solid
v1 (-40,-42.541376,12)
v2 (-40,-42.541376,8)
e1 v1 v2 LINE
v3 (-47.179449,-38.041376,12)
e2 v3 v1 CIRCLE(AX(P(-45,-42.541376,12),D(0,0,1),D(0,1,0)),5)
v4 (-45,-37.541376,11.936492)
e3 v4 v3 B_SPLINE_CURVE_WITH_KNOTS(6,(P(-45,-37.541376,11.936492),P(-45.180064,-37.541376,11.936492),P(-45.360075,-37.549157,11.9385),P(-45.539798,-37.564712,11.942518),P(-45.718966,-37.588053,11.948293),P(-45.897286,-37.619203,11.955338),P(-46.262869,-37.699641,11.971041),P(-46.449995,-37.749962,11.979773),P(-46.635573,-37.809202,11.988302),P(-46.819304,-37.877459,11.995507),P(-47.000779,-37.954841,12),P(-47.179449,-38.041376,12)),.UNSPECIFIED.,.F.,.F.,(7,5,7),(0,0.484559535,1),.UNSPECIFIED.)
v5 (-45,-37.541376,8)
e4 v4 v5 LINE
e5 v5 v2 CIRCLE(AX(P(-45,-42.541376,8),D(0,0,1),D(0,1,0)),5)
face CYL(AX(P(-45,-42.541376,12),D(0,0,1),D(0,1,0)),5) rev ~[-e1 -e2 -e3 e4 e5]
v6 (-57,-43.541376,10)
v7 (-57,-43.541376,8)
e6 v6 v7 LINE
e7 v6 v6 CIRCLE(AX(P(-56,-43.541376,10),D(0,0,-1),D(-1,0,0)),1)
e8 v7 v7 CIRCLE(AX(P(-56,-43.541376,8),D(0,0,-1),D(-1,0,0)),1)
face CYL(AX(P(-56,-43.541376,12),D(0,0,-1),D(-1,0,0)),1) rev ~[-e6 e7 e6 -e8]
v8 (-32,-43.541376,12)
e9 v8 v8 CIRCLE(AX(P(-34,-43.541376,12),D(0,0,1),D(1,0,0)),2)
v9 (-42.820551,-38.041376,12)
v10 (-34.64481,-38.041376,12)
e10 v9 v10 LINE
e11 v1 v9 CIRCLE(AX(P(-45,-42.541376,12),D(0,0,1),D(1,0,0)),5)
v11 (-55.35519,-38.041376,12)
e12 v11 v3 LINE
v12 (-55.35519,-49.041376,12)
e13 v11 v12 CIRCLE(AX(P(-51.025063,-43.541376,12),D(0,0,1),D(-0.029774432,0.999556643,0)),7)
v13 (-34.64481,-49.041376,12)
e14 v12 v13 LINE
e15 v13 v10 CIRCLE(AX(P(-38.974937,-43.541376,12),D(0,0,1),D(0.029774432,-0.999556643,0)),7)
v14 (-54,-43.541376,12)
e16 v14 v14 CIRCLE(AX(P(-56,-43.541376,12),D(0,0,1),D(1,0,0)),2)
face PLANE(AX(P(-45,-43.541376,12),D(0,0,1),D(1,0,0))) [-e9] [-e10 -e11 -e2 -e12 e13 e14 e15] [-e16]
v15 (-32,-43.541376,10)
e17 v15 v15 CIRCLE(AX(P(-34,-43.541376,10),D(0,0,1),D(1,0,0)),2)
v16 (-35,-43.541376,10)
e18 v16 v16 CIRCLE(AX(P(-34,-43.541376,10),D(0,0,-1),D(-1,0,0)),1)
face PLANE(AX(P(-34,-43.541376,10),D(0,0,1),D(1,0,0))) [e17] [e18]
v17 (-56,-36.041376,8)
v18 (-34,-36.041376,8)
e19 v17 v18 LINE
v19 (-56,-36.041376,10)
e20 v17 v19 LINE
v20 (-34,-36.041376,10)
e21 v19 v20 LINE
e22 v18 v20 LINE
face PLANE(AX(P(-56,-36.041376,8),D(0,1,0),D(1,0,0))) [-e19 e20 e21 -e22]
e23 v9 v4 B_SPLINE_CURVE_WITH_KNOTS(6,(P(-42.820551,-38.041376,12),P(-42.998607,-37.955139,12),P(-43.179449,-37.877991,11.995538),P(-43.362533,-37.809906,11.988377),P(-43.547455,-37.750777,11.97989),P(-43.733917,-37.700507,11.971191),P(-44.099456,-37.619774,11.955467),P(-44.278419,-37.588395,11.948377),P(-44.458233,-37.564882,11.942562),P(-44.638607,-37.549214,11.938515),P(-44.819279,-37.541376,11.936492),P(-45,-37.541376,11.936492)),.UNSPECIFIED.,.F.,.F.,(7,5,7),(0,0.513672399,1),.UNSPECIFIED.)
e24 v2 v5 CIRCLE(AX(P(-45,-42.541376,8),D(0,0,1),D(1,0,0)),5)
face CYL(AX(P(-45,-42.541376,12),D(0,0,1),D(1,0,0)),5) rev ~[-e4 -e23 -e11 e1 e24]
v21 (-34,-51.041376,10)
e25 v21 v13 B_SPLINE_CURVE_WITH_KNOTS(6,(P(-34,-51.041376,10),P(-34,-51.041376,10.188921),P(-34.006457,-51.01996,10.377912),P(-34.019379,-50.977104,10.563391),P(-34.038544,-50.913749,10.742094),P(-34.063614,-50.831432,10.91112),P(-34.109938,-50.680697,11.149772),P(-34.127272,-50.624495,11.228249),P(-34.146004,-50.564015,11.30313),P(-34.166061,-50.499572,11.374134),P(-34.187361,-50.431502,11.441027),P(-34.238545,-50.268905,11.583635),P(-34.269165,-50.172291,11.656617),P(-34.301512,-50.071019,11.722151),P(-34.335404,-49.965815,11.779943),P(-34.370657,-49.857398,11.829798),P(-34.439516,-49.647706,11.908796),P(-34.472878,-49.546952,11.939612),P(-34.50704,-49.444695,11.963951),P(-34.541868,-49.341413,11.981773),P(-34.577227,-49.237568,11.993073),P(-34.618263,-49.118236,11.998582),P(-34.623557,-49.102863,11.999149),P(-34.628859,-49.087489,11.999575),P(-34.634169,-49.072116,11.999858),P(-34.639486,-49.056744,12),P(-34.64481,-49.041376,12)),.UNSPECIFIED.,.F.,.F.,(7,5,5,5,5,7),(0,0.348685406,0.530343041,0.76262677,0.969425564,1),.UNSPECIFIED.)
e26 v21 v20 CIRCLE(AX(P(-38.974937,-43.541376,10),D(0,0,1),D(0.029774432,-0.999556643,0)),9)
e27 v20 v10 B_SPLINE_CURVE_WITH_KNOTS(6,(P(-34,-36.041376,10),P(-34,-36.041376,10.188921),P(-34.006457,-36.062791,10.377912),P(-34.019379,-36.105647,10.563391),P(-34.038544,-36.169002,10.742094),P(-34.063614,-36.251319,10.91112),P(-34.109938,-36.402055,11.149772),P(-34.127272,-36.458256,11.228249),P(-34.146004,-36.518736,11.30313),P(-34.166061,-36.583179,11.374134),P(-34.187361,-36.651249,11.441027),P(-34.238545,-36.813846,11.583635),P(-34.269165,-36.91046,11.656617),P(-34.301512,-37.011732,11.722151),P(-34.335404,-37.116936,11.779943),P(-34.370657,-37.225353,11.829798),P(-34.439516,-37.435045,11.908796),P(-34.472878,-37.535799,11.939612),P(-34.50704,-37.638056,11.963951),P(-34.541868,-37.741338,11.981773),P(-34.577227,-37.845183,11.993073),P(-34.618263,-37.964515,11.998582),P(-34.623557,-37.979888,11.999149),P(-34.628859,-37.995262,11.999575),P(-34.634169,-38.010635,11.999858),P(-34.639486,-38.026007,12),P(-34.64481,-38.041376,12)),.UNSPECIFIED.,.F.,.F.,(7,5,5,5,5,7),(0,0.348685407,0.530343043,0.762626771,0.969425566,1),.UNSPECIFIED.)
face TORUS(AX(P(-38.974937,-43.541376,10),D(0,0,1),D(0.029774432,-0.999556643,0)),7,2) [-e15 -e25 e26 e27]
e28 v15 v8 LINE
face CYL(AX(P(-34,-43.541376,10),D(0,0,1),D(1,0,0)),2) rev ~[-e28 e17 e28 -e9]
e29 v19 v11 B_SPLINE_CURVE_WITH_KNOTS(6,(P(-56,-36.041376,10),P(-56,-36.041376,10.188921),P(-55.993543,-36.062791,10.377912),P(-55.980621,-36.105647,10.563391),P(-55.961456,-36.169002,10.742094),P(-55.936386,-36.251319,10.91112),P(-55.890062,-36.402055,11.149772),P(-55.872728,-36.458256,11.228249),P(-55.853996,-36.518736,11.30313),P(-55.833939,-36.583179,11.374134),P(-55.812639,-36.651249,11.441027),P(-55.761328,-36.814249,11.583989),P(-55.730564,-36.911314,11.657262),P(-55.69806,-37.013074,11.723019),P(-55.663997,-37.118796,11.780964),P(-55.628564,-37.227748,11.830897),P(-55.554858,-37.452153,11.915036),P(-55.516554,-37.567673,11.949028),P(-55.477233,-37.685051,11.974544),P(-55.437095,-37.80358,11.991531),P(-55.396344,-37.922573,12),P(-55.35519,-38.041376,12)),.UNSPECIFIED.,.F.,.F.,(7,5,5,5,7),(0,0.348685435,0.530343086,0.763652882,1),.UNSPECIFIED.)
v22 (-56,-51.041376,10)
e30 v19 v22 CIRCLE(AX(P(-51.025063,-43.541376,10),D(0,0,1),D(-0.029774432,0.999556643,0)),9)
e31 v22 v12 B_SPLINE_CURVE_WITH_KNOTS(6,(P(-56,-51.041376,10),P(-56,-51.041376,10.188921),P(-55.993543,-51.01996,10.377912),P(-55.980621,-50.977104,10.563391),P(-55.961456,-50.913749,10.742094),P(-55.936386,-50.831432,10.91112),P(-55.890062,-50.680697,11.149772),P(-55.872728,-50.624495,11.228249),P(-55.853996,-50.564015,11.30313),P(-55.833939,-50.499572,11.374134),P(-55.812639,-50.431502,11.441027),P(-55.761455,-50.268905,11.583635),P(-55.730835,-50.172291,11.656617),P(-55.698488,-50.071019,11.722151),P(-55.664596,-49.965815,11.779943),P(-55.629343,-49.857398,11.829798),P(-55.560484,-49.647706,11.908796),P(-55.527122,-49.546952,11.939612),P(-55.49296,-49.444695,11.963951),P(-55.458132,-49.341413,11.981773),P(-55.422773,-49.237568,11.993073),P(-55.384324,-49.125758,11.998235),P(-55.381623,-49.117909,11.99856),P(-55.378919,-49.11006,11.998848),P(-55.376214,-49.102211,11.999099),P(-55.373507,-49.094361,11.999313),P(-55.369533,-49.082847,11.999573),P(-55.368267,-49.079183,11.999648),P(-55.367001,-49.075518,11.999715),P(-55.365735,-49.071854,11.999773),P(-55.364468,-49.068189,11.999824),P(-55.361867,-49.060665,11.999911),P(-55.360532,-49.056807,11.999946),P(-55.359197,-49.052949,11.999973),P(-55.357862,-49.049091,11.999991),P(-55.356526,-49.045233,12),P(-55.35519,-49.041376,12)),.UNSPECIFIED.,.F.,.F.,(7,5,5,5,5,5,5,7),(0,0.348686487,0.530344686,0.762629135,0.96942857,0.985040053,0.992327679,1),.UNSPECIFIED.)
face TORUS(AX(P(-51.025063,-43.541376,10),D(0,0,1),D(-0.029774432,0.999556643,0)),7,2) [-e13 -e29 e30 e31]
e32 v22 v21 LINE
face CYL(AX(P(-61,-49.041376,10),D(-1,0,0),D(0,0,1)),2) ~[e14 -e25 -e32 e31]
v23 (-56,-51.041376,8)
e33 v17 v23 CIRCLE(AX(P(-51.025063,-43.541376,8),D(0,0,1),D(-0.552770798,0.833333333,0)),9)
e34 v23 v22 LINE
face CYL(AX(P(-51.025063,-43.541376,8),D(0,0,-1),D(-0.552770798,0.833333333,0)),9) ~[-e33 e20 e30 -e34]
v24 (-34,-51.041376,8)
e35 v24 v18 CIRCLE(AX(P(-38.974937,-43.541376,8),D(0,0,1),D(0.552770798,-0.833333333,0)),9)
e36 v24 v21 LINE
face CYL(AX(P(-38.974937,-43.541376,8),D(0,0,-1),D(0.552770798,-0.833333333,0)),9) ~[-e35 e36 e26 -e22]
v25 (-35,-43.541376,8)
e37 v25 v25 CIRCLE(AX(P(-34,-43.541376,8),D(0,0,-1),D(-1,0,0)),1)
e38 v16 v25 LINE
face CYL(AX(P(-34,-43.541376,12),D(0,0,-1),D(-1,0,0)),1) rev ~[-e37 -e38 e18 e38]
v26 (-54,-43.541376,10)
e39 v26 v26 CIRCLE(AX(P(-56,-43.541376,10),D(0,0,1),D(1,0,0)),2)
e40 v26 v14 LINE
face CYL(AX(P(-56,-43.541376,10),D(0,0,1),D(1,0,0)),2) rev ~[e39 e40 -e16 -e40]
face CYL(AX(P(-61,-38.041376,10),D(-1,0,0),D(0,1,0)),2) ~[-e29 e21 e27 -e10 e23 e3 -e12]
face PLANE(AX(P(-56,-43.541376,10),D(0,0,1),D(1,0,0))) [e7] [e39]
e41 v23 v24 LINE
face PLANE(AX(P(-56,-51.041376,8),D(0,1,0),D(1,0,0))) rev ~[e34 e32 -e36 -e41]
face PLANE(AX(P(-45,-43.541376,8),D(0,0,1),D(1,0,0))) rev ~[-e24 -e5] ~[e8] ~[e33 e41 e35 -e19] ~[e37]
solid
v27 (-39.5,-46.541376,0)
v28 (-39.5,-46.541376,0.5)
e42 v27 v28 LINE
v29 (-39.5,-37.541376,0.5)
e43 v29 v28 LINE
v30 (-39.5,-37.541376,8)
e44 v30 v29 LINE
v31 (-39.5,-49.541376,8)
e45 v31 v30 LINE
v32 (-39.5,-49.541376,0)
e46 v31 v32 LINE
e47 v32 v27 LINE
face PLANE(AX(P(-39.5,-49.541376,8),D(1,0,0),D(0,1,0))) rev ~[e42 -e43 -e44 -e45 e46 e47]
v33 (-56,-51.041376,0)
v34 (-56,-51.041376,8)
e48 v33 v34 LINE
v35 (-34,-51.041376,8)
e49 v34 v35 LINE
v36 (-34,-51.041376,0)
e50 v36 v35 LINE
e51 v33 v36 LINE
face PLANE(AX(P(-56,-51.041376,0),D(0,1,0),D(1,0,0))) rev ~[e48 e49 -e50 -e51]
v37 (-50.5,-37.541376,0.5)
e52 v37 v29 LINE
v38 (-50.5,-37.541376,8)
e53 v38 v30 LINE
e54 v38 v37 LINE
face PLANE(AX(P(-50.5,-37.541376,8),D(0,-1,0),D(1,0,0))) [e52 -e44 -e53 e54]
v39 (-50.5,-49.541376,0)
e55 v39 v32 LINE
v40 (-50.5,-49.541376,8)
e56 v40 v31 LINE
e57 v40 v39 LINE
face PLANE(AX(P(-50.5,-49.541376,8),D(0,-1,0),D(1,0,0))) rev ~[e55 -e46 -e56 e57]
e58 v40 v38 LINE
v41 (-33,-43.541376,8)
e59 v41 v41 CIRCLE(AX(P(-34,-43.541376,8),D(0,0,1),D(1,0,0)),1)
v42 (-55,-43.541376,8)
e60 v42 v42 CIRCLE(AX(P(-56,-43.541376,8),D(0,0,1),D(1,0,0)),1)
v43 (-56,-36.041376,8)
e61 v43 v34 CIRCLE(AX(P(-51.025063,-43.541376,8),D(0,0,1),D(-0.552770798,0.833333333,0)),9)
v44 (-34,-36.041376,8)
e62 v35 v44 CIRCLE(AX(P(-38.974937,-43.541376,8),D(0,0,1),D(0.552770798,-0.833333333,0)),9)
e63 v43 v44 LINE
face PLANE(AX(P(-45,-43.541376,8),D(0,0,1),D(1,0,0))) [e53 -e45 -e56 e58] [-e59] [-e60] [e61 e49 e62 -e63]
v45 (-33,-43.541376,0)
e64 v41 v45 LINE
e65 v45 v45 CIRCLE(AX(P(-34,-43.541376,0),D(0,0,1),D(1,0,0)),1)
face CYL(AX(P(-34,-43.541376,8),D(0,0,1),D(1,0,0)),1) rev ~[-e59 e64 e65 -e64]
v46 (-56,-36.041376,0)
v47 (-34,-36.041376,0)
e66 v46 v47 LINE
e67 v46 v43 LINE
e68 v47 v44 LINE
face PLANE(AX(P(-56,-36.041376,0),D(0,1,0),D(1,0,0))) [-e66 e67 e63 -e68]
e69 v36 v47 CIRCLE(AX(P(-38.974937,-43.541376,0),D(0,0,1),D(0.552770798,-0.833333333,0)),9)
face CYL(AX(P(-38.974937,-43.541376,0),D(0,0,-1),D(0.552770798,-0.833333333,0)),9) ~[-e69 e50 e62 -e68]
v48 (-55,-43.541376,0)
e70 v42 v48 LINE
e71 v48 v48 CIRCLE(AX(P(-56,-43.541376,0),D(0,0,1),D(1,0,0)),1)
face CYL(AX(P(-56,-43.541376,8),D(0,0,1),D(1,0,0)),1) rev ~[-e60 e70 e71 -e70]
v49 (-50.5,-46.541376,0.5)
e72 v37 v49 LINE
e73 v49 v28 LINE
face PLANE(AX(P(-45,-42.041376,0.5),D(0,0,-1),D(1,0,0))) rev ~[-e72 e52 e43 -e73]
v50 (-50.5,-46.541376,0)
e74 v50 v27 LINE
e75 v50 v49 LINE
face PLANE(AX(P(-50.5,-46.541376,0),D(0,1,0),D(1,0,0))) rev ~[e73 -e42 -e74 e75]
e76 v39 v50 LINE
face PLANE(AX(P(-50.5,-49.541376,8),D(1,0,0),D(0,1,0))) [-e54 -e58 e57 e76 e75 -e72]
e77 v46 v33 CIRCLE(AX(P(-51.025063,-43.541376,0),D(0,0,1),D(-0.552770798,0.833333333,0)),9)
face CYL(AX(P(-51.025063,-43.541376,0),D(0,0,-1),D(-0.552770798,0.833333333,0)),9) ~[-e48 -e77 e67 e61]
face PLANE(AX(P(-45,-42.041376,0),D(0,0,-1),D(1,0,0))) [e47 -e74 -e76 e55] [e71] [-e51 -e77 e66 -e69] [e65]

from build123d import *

# Parameters (mm, degrees)
F0_W            = 22
F0_H            = 15
F1_DEPTH        = 8
F2_R            = 1
F2_W            = 11
F2_H            = 12
F3_DEPTH        = 9
F4_W            = 11
F4_H            = 9
F5_DEPTH        = 0.5
F6_W            = 22
F6_H            = 15
F7_DEPTH        = 4
F9_DEPTH        = 4
F10_T1_DEPTH    = 32
F10_T4_ANGLE    = 176.5875970816
F10_T6_ANGLE    = 176.5875970816
F11_D           = 2
F11_DEPTH       = 20
F11_CBORE_D     = 4
F11_CBORE_DEPTH = 2
F11_TIP         = 0.600860619


# Not quite as in the source:
# - a fillet or chamfer that OpenCascade refuses, or shapes differently, is made with other operations: its cross-section is extruded or revolved along the edge and cut away or added


with BuildPart() as f1:
    # F0 (on Top) → F1 (new body)
    with BuildSketch(Plane.XY):
        with Locations((-45, -43.5413755476)):
            Rectangle(F0_W, F0_H)
        with BuildLine():
            ThreePointArc((-34, -51.0413755476), (-29.9749371855, -43.5413755476), (-34, -36.0413755476))
            Line((-34, -36.0413755476), (-34, -51.0413755476))
        make_face()
        with BuildLine():
            Line((-56, -51.0413755476), (-56, -36.0413755476))
            ThreePointArc((-56, -36.0413755476), (-60.0250628145, -43.5413755476), (-56, -51.0413755476))
        make_face()
    extrude(amount=F1_DEPTH)

    # F2 (on face) → F3 (cut)
    with BuildSketch(Plane.XY.offset(8)):
        with Locations((-56, -43.5413755476)):
            Circle(F2_R)
        with Locations((-34, -43.5413755476)):
            Circle(F2_R)
        with Locations((-45, -43.5413755476)):
            Rectangle(F2_W, F2_H)
    extrude(amount=-F3_DEPTH, mode=Mode.SUBTRACT)

    # F4 (on face) → F5 (join)
    with BuildSketch(Plane(origin=(0, 0, 0), x_dir=(1, 0, 0), z_dir=(0, 0, -1))):
        with Locations((-45, 42.0413755476)):
            Rectangle(F4_W, F4_H)
    extrude(amount=-F5_DEPTH)


with BuildPart() as f7:
    # F6 (on face) → F7 (new body)
    with BuildSketch(Plane.XY.offset(8)):
        with Locations((-45, -43.5413755476)):
            Rectangle(F6_W, F6_H)
        with BuildLine():
            ThreePointArc((-34, -51.0413755476), (-29.9749371855, -43.5413755476), (-34, -36.0413755476))
            Line((-34, -36.0413755476), (-34, -51.0413755476))
        make_face()
        with BuildLine():
            Line((-56, -51.0413755476), (-56, -36.0413755476))
            ThreePointArc((-56, -36.0413755476), (-60.0250628145, -43.5413755476), (-56, -51.0413755476))
        make_face()
    extrude(amount=F7_DEPTH)

    # F8 (on face) → F9 (cut)
    with BuildSketch(Plane.XY.offset(12)):
        with BuildLine():
            ThreePointArc((-45, -37.5413755476), (-48.5355339059, -46.0769094536), (-40, -42.5413755476))
            ThreePointArc((-40, -42.5413755476), (-41.4644660941, -39.0058416417), (-45, -37.5413755476))
        make_face()
    extrude(amount=-F9_DEPTH, mode=Mode.SUBTRACT)

    # F10: fillet of radius 2 on 4 edges, made by hand

    # F10_s2 → F10_t1 (cut)
    with BuildSketch(Plane.YZ.offset(-61)):
        with BuildLine():
            ThreePointArc((-36.0413755476, 10), (-36.6271619853, 11.4142135624), (-38.0413755476, 12))
            Line((-38.0413755476, 12), (-36.0413755476, 12))
            Line((-36.0413755476, 12), (-36.0413755476, 10))
        make_face()
        with BuildLine():
            ThreePointArc((-49.0413755476, 12), (-50.45558911, 11.4142135624), (-51.0413755476, 10))
            Line((-51.0413755476, 10), (-51.0413755476, 12))
            Line((-51.0413755476, 12), (-49.0413755476, 12))
        make_face()
    extrude(amount=F10_T1_DEPTH, mode=Mode.SUBTRACT)

    # F10_s3 → F10_t4 (revolve, cut)
    with BuildSketch(Plane(origin=(-40.2362302043, -1.1985422881, 0), x_dir=(0, 0, 1), z_dir=(-0.9995566433, -0.0297744322, 0))):
        with BuildLine():
            ThreePointArc((10, -51.3616145647), (11.4142135624, -50.7758281271), (12, -49.3616145647))
            Line((12, -49.3616145647), (12, -51.3616145647))
            Line((12, -51.3616145647), (10, -51.3616145647))
        make_face()
    revolve(axis=Axis((-38.9749371855, -43.5413755476, 12), (0, 0, 1)), revolution_arc=F10_T4_ANGLE, mode=Mode.SUBTRACT)

    # F10_s5 → F10_t6 (revolve, cut)
    with BuildSketch(Plane(origin=(-52.2756731943, -1.557168866, 0), x_dir=(0, 0, 1), z_dir=(0.9995566433, 0.0297744322, 0))):
        with BuildLine():
            ThreePointArc((10, 33.0028289167), (11.4142135624, 33.5886153543), (12, 35.0028289167))
            Line((12, 35.0028289167), (12, 33.0028289167))
            Line((12, 33.0028289167), (10, 33.0028289167))
        make_face()
    revolve(axis=Axis((-51.0250628145, -43.5413755476, 12), (0, 0, 1)), revolution_arc=F10_T6_ANGLE, mode=Mode.SUBTRACT)

    # F11
    with Locations(Plane.XY.offset(12)):
        with Locations((-34, -43.5413755476), (-56, -43.5413755476)):
            CounterBoreHole(F11_D / 2, F11_CBORE_D / 2, F11_CBORE_DEPTH, depth=F11_DEPTH)
            with Locations((0, 0, -(F11_DEPTH + F11_TIP / 2))):  # 118° drill point
                Cone(0, F11_D / 2, F11_TIP, mode=Mode.SUBTRACT)


solid = Compound([f1.part, f7.part])
